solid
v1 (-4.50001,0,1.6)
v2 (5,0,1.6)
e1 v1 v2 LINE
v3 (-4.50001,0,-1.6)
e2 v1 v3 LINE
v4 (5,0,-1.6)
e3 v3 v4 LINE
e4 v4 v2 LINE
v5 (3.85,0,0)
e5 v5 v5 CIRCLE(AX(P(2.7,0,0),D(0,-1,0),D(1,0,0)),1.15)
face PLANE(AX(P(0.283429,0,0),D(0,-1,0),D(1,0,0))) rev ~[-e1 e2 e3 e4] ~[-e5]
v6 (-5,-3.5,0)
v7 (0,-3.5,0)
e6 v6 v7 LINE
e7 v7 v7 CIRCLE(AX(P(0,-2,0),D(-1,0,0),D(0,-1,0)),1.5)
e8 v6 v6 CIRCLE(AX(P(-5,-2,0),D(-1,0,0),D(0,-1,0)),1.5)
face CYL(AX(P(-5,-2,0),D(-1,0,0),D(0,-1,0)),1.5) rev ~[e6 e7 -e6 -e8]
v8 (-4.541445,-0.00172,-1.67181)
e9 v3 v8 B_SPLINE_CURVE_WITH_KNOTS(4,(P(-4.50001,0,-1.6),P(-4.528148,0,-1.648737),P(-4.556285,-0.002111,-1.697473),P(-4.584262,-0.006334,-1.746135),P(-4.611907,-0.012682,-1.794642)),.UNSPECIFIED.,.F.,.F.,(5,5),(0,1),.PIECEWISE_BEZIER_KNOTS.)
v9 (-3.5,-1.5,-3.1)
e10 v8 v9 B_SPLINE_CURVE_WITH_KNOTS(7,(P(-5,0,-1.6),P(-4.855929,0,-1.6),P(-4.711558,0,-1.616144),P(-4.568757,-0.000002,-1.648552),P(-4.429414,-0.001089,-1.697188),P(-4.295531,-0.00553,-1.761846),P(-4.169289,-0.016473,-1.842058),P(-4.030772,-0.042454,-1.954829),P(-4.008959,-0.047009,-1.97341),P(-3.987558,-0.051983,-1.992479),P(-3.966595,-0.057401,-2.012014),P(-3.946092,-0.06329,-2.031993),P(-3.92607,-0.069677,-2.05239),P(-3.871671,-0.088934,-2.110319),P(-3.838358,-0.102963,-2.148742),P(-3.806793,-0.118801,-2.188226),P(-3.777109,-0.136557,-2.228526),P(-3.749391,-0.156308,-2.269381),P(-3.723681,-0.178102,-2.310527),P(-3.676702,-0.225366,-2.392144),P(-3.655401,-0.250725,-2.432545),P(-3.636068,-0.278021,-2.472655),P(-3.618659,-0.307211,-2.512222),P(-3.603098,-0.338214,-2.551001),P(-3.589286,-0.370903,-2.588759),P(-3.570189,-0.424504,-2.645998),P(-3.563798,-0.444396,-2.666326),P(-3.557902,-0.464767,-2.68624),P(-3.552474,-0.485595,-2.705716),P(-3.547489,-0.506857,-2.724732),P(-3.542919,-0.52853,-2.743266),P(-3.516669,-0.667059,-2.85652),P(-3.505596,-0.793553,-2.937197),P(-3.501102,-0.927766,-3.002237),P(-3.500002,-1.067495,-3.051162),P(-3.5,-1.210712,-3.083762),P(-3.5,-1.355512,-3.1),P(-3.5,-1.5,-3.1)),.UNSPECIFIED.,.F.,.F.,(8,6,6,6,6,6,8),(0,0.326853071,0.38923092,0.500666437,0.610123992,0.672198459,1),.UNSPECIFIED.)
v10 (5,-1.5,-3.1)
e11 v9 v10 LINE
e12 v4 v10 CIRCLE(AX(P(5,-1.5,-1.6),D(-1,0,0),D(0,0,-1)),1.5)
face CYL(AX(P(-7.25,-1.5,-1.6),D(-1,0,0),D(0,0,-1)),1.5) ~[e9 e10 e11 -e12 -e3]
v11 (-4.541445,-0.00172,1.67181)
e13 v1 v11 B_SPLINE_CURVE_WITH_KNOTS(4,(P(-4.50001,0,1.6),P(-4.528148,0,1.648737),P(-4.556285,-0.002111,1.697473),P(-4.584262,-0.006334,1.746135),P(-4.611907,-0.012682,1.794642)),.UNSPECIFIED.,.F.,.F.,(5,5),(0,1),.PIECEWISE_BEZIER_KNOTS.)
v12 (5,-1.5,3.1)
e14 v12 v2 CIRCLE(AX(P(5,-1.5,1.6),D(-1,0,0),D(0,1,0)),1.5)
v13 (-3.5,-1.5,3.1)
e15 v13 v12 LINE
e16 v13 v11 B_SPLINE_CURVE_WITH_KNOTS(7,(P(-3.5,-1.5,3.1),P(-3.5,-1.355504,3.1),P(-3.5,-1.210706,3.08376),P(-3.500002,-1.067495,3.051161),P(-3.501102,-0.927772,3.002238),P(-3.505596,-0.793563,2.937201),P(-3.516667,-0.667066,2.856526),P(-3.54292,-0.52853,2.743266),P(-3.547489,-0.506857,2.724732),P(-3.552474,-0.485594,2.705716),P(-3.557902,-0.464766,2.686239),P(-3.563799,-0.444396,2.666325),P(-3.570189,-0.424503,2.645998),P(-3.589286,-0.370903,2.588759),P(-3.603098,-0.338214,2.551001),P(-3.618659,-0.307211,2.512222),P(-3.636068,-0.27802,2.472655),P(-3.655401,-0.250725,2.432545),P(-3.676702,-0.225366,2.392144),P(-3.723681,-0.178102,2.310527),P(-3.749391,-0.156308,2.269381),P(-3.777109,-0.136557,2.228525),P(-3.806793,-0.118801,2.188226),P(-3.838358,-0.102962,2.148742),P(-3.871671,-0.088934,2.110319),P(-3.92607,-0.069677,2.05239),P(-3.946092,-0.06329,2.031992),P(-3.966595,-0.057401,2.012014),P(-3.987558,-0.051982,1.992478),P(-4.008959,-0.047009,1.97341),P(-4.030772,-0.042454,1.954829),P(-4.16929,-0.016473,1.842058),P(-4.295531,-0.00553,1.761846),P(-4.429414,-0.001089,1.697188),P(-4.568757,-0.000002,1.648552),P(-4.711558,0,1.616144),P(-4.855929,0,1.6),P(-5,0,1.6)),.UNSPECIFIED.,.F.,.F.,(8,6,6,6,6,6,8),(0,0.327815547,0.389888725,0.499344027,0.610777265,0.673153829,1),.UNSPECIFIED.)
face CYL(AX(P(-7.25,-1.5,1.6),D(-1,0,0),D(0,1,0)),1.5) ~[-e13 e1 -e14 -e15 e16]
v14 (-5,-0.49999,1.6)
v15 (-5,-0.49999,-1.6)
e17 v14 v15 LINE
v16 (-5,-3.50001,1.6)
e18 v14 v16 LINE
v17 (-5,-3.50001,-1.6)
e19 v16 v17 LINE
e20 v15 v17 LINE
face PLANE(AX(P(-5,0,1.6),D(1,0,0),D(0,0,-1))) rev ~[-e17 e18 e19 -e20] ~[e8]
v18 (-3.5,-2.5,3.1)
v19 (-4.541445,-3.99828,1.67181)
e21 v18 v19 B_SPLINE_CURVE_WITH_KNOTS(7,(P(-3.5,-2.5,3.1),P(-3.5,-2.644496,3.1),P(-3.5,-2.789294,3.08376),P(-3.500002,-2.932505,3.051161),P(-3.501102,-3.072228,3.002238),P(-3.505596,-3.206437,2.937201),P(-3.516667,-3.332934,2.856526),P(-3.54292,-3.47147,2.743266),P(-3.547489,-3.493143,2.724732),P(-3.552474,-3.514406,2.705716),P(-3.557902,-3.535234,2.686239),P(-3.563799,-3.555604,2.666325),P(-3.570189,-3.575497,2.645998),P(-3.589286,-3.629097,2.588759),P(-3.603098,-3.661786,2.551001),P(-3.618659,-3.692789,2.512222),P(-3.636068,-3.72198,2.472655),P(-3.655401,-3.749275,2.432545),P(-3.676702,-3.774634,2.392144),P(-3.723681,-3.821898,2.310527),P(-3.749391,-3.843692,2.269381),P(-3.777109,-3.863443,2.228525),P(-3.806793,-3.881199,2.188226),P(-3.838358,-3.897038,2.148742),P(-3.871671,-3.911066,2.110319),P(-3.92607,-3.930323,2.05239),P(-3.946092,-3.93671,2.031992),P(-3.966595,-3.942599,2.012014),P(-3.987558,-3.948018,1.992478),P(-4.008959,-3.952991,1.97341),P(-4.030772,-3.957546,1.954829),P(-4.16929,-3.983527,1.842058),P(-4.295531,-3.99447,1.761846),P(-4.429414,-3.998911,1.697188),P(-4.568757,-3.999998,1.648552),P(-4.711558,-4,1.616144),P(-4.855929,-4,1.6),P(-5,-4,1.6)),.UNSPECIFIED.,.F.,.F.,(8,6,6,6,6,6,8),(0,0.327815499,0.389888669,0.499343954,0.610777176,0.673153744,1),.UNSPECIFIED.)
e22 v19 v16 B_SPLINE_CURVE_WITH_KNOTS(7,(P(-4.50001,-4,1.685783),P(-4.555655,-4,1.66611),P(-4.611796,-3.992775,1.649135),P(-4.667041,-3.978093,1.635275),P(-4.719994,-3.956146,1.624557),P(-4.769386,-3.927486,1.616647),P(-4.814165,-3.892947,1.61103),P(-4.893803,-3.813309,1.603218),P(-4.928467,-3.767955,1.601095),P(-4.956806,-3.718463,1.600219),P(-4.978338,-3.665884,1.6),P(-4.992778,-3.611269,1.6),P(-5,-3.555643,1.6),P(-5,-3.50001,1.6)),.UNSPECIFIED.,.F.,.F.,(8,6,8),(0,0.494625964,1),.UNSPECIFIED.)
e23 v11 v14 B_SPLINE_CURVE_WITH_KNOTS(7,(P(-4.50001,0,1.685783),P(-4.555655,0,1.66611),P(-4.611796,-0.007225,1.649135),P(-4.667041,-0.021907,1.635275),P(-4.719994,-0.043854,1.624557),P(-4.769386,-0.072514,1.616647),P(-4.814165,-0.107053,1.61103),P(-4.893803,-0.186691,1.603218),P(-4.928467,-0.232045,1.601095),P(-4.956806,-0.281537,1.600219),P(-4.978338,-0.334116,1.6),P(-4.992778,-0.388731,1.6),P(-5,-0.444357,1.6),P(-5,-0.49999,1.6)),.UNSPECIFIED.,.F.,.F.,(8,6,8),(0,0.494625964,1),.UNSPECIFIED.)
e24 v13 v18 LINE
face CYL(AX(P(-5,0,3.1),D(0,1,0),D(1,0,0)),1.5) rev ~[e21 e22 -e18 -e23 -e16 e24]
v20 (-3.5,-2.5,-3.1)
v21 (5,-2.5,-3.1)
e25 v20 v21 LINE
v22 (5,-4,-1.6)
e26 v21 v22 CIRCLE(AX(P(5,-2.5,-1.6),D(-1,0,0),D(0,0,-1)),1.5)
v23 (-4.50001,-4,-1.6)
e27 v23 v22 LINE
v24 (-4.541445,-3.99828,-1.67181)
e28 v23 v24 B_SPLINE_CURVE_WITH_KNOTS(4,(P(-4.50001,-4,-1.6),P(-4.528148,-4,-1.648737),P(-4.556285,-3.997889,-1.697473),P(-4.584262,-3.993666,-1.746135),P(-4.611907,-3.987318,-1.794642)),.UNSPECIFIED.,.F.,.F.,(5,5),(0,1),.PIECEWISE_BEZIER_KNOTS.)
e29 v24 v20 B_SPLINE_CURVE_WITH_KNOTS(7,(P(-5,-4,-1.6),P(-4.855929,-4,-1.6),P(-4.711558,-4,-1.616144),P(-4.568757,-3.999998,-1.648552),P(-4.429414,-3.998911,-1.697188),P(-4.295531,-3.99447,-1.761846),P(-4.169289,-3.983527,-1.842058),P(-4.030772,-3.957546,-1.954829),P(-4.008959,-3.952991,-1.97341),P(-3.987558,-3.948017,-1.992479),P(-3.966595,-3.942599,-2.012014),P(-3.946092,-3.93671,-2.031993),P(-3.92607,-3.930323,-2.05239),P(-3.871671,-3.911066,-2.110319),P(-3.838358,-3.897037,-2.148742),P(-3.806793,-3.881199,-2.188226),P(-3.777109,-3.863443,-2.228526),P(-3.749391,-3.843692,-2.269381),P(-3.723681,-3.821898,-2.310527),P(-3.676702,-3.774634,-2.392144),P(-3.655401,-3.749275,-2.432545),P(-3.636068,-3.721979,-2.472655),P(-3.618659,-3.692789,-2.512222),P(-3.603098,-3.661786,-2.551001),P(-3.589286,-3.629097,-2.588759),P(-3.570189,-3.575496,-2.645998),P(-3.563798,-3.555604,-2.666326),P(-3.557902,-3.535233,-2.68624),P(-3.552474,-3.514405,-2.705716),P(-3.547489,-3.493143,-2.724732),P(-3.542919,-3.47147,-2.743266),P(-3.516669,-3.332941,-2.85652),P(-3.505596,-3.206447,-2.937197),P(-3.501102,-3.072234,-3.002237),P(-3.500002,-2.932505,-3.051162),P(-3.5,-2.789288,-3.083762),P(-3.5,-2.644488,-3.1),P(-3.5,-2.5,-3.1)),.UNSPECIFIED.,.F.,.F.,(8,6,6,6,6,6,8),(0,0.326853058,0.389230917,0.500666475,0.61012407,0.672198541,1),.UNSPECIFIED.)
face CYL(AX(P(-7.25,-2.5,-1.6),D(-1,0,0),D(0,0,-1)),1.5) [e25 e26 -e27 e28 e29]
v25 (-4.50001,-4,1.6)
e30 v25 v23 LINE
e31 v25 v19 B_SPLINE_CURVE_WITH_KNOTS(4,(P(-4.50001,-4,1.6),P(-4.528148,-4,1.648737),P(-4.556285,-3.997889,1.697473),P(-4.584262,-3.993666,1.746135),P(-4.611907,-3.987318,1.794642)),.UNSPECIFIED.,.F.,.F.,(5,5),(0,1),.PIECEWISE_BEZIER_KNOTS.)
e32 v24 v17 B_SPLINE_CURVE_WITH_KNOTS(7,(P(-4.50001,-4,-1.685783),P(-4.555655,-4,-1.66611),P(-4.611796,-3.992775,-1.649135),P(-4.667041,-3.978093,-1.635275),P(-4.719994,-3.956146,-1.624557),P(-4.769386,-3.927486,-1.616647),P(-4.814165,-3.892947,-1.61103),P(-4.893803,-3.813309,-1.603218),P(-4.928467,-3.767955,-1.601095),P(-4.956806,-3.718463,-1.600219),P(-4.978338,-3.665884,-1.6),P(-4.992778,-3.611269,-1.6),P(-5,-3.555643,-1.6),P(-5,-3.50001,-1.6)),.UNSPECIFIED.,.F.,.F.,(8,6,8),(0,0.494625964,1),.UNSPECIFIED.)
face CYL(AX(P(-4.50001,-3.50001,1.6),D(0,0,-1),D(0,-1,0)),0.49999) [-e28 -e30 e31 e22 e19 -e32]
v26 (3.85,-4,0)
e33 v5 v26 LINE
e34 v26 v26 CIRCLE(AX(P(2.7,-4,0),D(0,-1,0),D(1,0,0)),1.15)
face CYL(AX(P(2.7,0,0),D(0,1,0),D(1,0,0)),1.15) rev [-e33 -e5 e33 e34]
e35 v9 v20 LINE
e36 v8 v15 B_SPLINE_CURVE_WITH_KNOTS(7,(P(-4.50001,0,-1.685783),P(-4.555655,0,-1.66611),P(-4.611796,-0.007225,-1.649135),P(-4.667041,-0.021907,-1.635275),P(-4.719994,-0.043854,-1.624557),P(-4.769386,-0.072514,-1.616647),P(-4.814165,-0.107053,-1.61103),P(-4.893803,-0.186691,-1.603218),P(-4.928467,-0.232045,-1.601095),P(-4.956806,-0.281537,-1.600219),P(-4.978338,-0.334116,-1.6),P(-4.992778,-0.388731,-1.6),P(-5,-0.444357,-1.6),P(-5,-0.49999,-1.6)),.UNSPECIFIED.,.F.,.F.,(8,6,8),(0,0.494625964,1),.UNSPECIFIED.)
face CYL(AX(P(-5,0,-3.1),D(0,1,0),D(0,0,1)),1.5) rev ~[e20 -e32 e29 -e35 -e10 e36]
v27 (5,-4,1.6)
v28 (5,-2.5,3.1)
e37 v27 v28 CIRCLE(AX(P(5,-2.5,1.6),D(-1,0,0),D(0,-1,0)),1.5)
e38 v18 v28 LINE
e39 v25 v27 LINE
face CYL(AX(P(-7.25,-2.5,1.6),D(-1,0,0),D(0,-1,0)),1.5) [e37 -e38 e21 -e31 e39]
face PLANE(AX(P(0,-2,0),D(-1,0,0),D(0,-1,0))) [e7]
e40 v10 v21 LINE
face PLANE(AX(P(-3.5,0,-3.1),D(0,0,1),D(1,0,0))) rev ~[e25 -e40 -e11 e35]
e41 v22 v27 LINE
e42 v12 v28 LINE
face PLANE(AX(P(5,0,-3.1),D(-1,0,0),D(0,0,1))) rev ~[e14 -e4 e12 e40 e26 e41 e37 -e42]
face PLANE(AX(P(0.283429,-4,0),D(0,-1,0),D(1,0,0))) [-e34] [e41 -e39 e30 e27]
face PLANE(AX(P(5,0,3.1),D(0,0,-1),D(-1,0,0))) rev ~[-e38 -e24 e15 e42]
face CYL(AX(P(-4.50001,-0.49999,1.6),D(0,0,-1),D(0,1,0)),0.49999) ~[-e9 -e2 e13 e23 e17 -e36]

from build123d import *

# Parameters (mm, degrees)
F0_R        = 1.15
F1_DEPTH    = 4
F2_R        = 1.5
F3_DEPTH    = 5
F4_T1_DEPTH = 16
F5_R        = 0.49999


# Not quite as in the source:
# - a fillet or chamfer that OpenCascade refuses, or shapes differently, is made with other operations: its cross-section is extruded or revolved along the edge and cut away or added
# - a fillet or chamfer is up to 0.001 mm smaller than in the source, because OpenCascade refuses the exact size


with BuildPart() as f1:
    # F0 (on Front) → F1 (new body)
    with BuildSketch(Plane.XZ):
        with BuildLine():
            Line((-3.5, -3.1), (5, -3.1))
            Line((5, -3.1), (5, 3.1))
            Line((5, 3.1), (-3.5, 3.1))
            ThreePointArc((-3.5, 3.1), (-3.9393398282, 2.0393398282), (-5, 1.6))
            Line((-5, 1.6), (-5, -1.6))
            ThreePointArc((-5, -1.6), (-3.9393398282, -2.0393398282), (-3.5, -3.1))
        make_face()
        with Locations((2.7, 0)):
            Circle(F0_R, mode=Mode.SUBTRACT)
    extrude(amount=F1_DEPTH)

    # F2 (on face) → F3 (cut)
    with BuildSketch(Plane(origin=(-5, 0, 0), x_dir=(0, -1, 0), z_dir=(-1, 0, 0))):
        with Locations((2, 0)):
            Circle(F2_R)
    extrude(amount=-F3_DEPTH, mode=Mode.SUBTRACT)

    # F4: fillet of radius 1.5 on 4 edges, made by hand

    # F4_s2 → F4_t1 (cut)
    with BuildSketch(Plane.YZ.offset(-7.25)):
        with BuildLine():
            ThreePointArc((0, 1.6), (-0.4393398282, 2.6606601718), (-1.5, 3.1))
            Line((-1.5, 3.1), (0, 3.1))
            Line((0, 3.1), (0, 1.6))
        make_face()
        with BuildLine():
            ThreePointArc((-4, 1.6), (-3.5606601718, 2.6606601718), (-2.5, 3.1))
            Line((-2.5, 3.1), (-4, 3.1))
            Line((-4, 3.1), (-4, 1.6))
        make_face()
        with BuildLine():
            ThreePointArc((-2.5, -3.1), (-3.5606601718, -2.6606601718), (-4, -1.6))
            Line((-4, -1.6), (-4, -3.1))
            Line((-4, -3.1), (-2.5, -3.1))
        make_face()
        with BuildLine():
            ThreePointArc((-1.5, -3.1), (-0.4393398282, -2.6606601718), (0, -1.6))
            Line((0, -1.6), (0, -3.1))
            Line((0, -3.1), (-1.5, -3.1))
        make_face()
    extrude(amount=F4_T1_DEPTH, mode=Mode.SUBTRACT)

    # F5 (radius 0.5 in the source; OpenCascade refuses exactly that, so slightly less here)
    f5_edges = [f1.edges().sort_by_distance(p)[0] for p in [
        (-5, 0, 0),
        (-5, -4, 0),
    ]]
    fillet(f5_edges, radius=F5_R)


solid = f1.part
